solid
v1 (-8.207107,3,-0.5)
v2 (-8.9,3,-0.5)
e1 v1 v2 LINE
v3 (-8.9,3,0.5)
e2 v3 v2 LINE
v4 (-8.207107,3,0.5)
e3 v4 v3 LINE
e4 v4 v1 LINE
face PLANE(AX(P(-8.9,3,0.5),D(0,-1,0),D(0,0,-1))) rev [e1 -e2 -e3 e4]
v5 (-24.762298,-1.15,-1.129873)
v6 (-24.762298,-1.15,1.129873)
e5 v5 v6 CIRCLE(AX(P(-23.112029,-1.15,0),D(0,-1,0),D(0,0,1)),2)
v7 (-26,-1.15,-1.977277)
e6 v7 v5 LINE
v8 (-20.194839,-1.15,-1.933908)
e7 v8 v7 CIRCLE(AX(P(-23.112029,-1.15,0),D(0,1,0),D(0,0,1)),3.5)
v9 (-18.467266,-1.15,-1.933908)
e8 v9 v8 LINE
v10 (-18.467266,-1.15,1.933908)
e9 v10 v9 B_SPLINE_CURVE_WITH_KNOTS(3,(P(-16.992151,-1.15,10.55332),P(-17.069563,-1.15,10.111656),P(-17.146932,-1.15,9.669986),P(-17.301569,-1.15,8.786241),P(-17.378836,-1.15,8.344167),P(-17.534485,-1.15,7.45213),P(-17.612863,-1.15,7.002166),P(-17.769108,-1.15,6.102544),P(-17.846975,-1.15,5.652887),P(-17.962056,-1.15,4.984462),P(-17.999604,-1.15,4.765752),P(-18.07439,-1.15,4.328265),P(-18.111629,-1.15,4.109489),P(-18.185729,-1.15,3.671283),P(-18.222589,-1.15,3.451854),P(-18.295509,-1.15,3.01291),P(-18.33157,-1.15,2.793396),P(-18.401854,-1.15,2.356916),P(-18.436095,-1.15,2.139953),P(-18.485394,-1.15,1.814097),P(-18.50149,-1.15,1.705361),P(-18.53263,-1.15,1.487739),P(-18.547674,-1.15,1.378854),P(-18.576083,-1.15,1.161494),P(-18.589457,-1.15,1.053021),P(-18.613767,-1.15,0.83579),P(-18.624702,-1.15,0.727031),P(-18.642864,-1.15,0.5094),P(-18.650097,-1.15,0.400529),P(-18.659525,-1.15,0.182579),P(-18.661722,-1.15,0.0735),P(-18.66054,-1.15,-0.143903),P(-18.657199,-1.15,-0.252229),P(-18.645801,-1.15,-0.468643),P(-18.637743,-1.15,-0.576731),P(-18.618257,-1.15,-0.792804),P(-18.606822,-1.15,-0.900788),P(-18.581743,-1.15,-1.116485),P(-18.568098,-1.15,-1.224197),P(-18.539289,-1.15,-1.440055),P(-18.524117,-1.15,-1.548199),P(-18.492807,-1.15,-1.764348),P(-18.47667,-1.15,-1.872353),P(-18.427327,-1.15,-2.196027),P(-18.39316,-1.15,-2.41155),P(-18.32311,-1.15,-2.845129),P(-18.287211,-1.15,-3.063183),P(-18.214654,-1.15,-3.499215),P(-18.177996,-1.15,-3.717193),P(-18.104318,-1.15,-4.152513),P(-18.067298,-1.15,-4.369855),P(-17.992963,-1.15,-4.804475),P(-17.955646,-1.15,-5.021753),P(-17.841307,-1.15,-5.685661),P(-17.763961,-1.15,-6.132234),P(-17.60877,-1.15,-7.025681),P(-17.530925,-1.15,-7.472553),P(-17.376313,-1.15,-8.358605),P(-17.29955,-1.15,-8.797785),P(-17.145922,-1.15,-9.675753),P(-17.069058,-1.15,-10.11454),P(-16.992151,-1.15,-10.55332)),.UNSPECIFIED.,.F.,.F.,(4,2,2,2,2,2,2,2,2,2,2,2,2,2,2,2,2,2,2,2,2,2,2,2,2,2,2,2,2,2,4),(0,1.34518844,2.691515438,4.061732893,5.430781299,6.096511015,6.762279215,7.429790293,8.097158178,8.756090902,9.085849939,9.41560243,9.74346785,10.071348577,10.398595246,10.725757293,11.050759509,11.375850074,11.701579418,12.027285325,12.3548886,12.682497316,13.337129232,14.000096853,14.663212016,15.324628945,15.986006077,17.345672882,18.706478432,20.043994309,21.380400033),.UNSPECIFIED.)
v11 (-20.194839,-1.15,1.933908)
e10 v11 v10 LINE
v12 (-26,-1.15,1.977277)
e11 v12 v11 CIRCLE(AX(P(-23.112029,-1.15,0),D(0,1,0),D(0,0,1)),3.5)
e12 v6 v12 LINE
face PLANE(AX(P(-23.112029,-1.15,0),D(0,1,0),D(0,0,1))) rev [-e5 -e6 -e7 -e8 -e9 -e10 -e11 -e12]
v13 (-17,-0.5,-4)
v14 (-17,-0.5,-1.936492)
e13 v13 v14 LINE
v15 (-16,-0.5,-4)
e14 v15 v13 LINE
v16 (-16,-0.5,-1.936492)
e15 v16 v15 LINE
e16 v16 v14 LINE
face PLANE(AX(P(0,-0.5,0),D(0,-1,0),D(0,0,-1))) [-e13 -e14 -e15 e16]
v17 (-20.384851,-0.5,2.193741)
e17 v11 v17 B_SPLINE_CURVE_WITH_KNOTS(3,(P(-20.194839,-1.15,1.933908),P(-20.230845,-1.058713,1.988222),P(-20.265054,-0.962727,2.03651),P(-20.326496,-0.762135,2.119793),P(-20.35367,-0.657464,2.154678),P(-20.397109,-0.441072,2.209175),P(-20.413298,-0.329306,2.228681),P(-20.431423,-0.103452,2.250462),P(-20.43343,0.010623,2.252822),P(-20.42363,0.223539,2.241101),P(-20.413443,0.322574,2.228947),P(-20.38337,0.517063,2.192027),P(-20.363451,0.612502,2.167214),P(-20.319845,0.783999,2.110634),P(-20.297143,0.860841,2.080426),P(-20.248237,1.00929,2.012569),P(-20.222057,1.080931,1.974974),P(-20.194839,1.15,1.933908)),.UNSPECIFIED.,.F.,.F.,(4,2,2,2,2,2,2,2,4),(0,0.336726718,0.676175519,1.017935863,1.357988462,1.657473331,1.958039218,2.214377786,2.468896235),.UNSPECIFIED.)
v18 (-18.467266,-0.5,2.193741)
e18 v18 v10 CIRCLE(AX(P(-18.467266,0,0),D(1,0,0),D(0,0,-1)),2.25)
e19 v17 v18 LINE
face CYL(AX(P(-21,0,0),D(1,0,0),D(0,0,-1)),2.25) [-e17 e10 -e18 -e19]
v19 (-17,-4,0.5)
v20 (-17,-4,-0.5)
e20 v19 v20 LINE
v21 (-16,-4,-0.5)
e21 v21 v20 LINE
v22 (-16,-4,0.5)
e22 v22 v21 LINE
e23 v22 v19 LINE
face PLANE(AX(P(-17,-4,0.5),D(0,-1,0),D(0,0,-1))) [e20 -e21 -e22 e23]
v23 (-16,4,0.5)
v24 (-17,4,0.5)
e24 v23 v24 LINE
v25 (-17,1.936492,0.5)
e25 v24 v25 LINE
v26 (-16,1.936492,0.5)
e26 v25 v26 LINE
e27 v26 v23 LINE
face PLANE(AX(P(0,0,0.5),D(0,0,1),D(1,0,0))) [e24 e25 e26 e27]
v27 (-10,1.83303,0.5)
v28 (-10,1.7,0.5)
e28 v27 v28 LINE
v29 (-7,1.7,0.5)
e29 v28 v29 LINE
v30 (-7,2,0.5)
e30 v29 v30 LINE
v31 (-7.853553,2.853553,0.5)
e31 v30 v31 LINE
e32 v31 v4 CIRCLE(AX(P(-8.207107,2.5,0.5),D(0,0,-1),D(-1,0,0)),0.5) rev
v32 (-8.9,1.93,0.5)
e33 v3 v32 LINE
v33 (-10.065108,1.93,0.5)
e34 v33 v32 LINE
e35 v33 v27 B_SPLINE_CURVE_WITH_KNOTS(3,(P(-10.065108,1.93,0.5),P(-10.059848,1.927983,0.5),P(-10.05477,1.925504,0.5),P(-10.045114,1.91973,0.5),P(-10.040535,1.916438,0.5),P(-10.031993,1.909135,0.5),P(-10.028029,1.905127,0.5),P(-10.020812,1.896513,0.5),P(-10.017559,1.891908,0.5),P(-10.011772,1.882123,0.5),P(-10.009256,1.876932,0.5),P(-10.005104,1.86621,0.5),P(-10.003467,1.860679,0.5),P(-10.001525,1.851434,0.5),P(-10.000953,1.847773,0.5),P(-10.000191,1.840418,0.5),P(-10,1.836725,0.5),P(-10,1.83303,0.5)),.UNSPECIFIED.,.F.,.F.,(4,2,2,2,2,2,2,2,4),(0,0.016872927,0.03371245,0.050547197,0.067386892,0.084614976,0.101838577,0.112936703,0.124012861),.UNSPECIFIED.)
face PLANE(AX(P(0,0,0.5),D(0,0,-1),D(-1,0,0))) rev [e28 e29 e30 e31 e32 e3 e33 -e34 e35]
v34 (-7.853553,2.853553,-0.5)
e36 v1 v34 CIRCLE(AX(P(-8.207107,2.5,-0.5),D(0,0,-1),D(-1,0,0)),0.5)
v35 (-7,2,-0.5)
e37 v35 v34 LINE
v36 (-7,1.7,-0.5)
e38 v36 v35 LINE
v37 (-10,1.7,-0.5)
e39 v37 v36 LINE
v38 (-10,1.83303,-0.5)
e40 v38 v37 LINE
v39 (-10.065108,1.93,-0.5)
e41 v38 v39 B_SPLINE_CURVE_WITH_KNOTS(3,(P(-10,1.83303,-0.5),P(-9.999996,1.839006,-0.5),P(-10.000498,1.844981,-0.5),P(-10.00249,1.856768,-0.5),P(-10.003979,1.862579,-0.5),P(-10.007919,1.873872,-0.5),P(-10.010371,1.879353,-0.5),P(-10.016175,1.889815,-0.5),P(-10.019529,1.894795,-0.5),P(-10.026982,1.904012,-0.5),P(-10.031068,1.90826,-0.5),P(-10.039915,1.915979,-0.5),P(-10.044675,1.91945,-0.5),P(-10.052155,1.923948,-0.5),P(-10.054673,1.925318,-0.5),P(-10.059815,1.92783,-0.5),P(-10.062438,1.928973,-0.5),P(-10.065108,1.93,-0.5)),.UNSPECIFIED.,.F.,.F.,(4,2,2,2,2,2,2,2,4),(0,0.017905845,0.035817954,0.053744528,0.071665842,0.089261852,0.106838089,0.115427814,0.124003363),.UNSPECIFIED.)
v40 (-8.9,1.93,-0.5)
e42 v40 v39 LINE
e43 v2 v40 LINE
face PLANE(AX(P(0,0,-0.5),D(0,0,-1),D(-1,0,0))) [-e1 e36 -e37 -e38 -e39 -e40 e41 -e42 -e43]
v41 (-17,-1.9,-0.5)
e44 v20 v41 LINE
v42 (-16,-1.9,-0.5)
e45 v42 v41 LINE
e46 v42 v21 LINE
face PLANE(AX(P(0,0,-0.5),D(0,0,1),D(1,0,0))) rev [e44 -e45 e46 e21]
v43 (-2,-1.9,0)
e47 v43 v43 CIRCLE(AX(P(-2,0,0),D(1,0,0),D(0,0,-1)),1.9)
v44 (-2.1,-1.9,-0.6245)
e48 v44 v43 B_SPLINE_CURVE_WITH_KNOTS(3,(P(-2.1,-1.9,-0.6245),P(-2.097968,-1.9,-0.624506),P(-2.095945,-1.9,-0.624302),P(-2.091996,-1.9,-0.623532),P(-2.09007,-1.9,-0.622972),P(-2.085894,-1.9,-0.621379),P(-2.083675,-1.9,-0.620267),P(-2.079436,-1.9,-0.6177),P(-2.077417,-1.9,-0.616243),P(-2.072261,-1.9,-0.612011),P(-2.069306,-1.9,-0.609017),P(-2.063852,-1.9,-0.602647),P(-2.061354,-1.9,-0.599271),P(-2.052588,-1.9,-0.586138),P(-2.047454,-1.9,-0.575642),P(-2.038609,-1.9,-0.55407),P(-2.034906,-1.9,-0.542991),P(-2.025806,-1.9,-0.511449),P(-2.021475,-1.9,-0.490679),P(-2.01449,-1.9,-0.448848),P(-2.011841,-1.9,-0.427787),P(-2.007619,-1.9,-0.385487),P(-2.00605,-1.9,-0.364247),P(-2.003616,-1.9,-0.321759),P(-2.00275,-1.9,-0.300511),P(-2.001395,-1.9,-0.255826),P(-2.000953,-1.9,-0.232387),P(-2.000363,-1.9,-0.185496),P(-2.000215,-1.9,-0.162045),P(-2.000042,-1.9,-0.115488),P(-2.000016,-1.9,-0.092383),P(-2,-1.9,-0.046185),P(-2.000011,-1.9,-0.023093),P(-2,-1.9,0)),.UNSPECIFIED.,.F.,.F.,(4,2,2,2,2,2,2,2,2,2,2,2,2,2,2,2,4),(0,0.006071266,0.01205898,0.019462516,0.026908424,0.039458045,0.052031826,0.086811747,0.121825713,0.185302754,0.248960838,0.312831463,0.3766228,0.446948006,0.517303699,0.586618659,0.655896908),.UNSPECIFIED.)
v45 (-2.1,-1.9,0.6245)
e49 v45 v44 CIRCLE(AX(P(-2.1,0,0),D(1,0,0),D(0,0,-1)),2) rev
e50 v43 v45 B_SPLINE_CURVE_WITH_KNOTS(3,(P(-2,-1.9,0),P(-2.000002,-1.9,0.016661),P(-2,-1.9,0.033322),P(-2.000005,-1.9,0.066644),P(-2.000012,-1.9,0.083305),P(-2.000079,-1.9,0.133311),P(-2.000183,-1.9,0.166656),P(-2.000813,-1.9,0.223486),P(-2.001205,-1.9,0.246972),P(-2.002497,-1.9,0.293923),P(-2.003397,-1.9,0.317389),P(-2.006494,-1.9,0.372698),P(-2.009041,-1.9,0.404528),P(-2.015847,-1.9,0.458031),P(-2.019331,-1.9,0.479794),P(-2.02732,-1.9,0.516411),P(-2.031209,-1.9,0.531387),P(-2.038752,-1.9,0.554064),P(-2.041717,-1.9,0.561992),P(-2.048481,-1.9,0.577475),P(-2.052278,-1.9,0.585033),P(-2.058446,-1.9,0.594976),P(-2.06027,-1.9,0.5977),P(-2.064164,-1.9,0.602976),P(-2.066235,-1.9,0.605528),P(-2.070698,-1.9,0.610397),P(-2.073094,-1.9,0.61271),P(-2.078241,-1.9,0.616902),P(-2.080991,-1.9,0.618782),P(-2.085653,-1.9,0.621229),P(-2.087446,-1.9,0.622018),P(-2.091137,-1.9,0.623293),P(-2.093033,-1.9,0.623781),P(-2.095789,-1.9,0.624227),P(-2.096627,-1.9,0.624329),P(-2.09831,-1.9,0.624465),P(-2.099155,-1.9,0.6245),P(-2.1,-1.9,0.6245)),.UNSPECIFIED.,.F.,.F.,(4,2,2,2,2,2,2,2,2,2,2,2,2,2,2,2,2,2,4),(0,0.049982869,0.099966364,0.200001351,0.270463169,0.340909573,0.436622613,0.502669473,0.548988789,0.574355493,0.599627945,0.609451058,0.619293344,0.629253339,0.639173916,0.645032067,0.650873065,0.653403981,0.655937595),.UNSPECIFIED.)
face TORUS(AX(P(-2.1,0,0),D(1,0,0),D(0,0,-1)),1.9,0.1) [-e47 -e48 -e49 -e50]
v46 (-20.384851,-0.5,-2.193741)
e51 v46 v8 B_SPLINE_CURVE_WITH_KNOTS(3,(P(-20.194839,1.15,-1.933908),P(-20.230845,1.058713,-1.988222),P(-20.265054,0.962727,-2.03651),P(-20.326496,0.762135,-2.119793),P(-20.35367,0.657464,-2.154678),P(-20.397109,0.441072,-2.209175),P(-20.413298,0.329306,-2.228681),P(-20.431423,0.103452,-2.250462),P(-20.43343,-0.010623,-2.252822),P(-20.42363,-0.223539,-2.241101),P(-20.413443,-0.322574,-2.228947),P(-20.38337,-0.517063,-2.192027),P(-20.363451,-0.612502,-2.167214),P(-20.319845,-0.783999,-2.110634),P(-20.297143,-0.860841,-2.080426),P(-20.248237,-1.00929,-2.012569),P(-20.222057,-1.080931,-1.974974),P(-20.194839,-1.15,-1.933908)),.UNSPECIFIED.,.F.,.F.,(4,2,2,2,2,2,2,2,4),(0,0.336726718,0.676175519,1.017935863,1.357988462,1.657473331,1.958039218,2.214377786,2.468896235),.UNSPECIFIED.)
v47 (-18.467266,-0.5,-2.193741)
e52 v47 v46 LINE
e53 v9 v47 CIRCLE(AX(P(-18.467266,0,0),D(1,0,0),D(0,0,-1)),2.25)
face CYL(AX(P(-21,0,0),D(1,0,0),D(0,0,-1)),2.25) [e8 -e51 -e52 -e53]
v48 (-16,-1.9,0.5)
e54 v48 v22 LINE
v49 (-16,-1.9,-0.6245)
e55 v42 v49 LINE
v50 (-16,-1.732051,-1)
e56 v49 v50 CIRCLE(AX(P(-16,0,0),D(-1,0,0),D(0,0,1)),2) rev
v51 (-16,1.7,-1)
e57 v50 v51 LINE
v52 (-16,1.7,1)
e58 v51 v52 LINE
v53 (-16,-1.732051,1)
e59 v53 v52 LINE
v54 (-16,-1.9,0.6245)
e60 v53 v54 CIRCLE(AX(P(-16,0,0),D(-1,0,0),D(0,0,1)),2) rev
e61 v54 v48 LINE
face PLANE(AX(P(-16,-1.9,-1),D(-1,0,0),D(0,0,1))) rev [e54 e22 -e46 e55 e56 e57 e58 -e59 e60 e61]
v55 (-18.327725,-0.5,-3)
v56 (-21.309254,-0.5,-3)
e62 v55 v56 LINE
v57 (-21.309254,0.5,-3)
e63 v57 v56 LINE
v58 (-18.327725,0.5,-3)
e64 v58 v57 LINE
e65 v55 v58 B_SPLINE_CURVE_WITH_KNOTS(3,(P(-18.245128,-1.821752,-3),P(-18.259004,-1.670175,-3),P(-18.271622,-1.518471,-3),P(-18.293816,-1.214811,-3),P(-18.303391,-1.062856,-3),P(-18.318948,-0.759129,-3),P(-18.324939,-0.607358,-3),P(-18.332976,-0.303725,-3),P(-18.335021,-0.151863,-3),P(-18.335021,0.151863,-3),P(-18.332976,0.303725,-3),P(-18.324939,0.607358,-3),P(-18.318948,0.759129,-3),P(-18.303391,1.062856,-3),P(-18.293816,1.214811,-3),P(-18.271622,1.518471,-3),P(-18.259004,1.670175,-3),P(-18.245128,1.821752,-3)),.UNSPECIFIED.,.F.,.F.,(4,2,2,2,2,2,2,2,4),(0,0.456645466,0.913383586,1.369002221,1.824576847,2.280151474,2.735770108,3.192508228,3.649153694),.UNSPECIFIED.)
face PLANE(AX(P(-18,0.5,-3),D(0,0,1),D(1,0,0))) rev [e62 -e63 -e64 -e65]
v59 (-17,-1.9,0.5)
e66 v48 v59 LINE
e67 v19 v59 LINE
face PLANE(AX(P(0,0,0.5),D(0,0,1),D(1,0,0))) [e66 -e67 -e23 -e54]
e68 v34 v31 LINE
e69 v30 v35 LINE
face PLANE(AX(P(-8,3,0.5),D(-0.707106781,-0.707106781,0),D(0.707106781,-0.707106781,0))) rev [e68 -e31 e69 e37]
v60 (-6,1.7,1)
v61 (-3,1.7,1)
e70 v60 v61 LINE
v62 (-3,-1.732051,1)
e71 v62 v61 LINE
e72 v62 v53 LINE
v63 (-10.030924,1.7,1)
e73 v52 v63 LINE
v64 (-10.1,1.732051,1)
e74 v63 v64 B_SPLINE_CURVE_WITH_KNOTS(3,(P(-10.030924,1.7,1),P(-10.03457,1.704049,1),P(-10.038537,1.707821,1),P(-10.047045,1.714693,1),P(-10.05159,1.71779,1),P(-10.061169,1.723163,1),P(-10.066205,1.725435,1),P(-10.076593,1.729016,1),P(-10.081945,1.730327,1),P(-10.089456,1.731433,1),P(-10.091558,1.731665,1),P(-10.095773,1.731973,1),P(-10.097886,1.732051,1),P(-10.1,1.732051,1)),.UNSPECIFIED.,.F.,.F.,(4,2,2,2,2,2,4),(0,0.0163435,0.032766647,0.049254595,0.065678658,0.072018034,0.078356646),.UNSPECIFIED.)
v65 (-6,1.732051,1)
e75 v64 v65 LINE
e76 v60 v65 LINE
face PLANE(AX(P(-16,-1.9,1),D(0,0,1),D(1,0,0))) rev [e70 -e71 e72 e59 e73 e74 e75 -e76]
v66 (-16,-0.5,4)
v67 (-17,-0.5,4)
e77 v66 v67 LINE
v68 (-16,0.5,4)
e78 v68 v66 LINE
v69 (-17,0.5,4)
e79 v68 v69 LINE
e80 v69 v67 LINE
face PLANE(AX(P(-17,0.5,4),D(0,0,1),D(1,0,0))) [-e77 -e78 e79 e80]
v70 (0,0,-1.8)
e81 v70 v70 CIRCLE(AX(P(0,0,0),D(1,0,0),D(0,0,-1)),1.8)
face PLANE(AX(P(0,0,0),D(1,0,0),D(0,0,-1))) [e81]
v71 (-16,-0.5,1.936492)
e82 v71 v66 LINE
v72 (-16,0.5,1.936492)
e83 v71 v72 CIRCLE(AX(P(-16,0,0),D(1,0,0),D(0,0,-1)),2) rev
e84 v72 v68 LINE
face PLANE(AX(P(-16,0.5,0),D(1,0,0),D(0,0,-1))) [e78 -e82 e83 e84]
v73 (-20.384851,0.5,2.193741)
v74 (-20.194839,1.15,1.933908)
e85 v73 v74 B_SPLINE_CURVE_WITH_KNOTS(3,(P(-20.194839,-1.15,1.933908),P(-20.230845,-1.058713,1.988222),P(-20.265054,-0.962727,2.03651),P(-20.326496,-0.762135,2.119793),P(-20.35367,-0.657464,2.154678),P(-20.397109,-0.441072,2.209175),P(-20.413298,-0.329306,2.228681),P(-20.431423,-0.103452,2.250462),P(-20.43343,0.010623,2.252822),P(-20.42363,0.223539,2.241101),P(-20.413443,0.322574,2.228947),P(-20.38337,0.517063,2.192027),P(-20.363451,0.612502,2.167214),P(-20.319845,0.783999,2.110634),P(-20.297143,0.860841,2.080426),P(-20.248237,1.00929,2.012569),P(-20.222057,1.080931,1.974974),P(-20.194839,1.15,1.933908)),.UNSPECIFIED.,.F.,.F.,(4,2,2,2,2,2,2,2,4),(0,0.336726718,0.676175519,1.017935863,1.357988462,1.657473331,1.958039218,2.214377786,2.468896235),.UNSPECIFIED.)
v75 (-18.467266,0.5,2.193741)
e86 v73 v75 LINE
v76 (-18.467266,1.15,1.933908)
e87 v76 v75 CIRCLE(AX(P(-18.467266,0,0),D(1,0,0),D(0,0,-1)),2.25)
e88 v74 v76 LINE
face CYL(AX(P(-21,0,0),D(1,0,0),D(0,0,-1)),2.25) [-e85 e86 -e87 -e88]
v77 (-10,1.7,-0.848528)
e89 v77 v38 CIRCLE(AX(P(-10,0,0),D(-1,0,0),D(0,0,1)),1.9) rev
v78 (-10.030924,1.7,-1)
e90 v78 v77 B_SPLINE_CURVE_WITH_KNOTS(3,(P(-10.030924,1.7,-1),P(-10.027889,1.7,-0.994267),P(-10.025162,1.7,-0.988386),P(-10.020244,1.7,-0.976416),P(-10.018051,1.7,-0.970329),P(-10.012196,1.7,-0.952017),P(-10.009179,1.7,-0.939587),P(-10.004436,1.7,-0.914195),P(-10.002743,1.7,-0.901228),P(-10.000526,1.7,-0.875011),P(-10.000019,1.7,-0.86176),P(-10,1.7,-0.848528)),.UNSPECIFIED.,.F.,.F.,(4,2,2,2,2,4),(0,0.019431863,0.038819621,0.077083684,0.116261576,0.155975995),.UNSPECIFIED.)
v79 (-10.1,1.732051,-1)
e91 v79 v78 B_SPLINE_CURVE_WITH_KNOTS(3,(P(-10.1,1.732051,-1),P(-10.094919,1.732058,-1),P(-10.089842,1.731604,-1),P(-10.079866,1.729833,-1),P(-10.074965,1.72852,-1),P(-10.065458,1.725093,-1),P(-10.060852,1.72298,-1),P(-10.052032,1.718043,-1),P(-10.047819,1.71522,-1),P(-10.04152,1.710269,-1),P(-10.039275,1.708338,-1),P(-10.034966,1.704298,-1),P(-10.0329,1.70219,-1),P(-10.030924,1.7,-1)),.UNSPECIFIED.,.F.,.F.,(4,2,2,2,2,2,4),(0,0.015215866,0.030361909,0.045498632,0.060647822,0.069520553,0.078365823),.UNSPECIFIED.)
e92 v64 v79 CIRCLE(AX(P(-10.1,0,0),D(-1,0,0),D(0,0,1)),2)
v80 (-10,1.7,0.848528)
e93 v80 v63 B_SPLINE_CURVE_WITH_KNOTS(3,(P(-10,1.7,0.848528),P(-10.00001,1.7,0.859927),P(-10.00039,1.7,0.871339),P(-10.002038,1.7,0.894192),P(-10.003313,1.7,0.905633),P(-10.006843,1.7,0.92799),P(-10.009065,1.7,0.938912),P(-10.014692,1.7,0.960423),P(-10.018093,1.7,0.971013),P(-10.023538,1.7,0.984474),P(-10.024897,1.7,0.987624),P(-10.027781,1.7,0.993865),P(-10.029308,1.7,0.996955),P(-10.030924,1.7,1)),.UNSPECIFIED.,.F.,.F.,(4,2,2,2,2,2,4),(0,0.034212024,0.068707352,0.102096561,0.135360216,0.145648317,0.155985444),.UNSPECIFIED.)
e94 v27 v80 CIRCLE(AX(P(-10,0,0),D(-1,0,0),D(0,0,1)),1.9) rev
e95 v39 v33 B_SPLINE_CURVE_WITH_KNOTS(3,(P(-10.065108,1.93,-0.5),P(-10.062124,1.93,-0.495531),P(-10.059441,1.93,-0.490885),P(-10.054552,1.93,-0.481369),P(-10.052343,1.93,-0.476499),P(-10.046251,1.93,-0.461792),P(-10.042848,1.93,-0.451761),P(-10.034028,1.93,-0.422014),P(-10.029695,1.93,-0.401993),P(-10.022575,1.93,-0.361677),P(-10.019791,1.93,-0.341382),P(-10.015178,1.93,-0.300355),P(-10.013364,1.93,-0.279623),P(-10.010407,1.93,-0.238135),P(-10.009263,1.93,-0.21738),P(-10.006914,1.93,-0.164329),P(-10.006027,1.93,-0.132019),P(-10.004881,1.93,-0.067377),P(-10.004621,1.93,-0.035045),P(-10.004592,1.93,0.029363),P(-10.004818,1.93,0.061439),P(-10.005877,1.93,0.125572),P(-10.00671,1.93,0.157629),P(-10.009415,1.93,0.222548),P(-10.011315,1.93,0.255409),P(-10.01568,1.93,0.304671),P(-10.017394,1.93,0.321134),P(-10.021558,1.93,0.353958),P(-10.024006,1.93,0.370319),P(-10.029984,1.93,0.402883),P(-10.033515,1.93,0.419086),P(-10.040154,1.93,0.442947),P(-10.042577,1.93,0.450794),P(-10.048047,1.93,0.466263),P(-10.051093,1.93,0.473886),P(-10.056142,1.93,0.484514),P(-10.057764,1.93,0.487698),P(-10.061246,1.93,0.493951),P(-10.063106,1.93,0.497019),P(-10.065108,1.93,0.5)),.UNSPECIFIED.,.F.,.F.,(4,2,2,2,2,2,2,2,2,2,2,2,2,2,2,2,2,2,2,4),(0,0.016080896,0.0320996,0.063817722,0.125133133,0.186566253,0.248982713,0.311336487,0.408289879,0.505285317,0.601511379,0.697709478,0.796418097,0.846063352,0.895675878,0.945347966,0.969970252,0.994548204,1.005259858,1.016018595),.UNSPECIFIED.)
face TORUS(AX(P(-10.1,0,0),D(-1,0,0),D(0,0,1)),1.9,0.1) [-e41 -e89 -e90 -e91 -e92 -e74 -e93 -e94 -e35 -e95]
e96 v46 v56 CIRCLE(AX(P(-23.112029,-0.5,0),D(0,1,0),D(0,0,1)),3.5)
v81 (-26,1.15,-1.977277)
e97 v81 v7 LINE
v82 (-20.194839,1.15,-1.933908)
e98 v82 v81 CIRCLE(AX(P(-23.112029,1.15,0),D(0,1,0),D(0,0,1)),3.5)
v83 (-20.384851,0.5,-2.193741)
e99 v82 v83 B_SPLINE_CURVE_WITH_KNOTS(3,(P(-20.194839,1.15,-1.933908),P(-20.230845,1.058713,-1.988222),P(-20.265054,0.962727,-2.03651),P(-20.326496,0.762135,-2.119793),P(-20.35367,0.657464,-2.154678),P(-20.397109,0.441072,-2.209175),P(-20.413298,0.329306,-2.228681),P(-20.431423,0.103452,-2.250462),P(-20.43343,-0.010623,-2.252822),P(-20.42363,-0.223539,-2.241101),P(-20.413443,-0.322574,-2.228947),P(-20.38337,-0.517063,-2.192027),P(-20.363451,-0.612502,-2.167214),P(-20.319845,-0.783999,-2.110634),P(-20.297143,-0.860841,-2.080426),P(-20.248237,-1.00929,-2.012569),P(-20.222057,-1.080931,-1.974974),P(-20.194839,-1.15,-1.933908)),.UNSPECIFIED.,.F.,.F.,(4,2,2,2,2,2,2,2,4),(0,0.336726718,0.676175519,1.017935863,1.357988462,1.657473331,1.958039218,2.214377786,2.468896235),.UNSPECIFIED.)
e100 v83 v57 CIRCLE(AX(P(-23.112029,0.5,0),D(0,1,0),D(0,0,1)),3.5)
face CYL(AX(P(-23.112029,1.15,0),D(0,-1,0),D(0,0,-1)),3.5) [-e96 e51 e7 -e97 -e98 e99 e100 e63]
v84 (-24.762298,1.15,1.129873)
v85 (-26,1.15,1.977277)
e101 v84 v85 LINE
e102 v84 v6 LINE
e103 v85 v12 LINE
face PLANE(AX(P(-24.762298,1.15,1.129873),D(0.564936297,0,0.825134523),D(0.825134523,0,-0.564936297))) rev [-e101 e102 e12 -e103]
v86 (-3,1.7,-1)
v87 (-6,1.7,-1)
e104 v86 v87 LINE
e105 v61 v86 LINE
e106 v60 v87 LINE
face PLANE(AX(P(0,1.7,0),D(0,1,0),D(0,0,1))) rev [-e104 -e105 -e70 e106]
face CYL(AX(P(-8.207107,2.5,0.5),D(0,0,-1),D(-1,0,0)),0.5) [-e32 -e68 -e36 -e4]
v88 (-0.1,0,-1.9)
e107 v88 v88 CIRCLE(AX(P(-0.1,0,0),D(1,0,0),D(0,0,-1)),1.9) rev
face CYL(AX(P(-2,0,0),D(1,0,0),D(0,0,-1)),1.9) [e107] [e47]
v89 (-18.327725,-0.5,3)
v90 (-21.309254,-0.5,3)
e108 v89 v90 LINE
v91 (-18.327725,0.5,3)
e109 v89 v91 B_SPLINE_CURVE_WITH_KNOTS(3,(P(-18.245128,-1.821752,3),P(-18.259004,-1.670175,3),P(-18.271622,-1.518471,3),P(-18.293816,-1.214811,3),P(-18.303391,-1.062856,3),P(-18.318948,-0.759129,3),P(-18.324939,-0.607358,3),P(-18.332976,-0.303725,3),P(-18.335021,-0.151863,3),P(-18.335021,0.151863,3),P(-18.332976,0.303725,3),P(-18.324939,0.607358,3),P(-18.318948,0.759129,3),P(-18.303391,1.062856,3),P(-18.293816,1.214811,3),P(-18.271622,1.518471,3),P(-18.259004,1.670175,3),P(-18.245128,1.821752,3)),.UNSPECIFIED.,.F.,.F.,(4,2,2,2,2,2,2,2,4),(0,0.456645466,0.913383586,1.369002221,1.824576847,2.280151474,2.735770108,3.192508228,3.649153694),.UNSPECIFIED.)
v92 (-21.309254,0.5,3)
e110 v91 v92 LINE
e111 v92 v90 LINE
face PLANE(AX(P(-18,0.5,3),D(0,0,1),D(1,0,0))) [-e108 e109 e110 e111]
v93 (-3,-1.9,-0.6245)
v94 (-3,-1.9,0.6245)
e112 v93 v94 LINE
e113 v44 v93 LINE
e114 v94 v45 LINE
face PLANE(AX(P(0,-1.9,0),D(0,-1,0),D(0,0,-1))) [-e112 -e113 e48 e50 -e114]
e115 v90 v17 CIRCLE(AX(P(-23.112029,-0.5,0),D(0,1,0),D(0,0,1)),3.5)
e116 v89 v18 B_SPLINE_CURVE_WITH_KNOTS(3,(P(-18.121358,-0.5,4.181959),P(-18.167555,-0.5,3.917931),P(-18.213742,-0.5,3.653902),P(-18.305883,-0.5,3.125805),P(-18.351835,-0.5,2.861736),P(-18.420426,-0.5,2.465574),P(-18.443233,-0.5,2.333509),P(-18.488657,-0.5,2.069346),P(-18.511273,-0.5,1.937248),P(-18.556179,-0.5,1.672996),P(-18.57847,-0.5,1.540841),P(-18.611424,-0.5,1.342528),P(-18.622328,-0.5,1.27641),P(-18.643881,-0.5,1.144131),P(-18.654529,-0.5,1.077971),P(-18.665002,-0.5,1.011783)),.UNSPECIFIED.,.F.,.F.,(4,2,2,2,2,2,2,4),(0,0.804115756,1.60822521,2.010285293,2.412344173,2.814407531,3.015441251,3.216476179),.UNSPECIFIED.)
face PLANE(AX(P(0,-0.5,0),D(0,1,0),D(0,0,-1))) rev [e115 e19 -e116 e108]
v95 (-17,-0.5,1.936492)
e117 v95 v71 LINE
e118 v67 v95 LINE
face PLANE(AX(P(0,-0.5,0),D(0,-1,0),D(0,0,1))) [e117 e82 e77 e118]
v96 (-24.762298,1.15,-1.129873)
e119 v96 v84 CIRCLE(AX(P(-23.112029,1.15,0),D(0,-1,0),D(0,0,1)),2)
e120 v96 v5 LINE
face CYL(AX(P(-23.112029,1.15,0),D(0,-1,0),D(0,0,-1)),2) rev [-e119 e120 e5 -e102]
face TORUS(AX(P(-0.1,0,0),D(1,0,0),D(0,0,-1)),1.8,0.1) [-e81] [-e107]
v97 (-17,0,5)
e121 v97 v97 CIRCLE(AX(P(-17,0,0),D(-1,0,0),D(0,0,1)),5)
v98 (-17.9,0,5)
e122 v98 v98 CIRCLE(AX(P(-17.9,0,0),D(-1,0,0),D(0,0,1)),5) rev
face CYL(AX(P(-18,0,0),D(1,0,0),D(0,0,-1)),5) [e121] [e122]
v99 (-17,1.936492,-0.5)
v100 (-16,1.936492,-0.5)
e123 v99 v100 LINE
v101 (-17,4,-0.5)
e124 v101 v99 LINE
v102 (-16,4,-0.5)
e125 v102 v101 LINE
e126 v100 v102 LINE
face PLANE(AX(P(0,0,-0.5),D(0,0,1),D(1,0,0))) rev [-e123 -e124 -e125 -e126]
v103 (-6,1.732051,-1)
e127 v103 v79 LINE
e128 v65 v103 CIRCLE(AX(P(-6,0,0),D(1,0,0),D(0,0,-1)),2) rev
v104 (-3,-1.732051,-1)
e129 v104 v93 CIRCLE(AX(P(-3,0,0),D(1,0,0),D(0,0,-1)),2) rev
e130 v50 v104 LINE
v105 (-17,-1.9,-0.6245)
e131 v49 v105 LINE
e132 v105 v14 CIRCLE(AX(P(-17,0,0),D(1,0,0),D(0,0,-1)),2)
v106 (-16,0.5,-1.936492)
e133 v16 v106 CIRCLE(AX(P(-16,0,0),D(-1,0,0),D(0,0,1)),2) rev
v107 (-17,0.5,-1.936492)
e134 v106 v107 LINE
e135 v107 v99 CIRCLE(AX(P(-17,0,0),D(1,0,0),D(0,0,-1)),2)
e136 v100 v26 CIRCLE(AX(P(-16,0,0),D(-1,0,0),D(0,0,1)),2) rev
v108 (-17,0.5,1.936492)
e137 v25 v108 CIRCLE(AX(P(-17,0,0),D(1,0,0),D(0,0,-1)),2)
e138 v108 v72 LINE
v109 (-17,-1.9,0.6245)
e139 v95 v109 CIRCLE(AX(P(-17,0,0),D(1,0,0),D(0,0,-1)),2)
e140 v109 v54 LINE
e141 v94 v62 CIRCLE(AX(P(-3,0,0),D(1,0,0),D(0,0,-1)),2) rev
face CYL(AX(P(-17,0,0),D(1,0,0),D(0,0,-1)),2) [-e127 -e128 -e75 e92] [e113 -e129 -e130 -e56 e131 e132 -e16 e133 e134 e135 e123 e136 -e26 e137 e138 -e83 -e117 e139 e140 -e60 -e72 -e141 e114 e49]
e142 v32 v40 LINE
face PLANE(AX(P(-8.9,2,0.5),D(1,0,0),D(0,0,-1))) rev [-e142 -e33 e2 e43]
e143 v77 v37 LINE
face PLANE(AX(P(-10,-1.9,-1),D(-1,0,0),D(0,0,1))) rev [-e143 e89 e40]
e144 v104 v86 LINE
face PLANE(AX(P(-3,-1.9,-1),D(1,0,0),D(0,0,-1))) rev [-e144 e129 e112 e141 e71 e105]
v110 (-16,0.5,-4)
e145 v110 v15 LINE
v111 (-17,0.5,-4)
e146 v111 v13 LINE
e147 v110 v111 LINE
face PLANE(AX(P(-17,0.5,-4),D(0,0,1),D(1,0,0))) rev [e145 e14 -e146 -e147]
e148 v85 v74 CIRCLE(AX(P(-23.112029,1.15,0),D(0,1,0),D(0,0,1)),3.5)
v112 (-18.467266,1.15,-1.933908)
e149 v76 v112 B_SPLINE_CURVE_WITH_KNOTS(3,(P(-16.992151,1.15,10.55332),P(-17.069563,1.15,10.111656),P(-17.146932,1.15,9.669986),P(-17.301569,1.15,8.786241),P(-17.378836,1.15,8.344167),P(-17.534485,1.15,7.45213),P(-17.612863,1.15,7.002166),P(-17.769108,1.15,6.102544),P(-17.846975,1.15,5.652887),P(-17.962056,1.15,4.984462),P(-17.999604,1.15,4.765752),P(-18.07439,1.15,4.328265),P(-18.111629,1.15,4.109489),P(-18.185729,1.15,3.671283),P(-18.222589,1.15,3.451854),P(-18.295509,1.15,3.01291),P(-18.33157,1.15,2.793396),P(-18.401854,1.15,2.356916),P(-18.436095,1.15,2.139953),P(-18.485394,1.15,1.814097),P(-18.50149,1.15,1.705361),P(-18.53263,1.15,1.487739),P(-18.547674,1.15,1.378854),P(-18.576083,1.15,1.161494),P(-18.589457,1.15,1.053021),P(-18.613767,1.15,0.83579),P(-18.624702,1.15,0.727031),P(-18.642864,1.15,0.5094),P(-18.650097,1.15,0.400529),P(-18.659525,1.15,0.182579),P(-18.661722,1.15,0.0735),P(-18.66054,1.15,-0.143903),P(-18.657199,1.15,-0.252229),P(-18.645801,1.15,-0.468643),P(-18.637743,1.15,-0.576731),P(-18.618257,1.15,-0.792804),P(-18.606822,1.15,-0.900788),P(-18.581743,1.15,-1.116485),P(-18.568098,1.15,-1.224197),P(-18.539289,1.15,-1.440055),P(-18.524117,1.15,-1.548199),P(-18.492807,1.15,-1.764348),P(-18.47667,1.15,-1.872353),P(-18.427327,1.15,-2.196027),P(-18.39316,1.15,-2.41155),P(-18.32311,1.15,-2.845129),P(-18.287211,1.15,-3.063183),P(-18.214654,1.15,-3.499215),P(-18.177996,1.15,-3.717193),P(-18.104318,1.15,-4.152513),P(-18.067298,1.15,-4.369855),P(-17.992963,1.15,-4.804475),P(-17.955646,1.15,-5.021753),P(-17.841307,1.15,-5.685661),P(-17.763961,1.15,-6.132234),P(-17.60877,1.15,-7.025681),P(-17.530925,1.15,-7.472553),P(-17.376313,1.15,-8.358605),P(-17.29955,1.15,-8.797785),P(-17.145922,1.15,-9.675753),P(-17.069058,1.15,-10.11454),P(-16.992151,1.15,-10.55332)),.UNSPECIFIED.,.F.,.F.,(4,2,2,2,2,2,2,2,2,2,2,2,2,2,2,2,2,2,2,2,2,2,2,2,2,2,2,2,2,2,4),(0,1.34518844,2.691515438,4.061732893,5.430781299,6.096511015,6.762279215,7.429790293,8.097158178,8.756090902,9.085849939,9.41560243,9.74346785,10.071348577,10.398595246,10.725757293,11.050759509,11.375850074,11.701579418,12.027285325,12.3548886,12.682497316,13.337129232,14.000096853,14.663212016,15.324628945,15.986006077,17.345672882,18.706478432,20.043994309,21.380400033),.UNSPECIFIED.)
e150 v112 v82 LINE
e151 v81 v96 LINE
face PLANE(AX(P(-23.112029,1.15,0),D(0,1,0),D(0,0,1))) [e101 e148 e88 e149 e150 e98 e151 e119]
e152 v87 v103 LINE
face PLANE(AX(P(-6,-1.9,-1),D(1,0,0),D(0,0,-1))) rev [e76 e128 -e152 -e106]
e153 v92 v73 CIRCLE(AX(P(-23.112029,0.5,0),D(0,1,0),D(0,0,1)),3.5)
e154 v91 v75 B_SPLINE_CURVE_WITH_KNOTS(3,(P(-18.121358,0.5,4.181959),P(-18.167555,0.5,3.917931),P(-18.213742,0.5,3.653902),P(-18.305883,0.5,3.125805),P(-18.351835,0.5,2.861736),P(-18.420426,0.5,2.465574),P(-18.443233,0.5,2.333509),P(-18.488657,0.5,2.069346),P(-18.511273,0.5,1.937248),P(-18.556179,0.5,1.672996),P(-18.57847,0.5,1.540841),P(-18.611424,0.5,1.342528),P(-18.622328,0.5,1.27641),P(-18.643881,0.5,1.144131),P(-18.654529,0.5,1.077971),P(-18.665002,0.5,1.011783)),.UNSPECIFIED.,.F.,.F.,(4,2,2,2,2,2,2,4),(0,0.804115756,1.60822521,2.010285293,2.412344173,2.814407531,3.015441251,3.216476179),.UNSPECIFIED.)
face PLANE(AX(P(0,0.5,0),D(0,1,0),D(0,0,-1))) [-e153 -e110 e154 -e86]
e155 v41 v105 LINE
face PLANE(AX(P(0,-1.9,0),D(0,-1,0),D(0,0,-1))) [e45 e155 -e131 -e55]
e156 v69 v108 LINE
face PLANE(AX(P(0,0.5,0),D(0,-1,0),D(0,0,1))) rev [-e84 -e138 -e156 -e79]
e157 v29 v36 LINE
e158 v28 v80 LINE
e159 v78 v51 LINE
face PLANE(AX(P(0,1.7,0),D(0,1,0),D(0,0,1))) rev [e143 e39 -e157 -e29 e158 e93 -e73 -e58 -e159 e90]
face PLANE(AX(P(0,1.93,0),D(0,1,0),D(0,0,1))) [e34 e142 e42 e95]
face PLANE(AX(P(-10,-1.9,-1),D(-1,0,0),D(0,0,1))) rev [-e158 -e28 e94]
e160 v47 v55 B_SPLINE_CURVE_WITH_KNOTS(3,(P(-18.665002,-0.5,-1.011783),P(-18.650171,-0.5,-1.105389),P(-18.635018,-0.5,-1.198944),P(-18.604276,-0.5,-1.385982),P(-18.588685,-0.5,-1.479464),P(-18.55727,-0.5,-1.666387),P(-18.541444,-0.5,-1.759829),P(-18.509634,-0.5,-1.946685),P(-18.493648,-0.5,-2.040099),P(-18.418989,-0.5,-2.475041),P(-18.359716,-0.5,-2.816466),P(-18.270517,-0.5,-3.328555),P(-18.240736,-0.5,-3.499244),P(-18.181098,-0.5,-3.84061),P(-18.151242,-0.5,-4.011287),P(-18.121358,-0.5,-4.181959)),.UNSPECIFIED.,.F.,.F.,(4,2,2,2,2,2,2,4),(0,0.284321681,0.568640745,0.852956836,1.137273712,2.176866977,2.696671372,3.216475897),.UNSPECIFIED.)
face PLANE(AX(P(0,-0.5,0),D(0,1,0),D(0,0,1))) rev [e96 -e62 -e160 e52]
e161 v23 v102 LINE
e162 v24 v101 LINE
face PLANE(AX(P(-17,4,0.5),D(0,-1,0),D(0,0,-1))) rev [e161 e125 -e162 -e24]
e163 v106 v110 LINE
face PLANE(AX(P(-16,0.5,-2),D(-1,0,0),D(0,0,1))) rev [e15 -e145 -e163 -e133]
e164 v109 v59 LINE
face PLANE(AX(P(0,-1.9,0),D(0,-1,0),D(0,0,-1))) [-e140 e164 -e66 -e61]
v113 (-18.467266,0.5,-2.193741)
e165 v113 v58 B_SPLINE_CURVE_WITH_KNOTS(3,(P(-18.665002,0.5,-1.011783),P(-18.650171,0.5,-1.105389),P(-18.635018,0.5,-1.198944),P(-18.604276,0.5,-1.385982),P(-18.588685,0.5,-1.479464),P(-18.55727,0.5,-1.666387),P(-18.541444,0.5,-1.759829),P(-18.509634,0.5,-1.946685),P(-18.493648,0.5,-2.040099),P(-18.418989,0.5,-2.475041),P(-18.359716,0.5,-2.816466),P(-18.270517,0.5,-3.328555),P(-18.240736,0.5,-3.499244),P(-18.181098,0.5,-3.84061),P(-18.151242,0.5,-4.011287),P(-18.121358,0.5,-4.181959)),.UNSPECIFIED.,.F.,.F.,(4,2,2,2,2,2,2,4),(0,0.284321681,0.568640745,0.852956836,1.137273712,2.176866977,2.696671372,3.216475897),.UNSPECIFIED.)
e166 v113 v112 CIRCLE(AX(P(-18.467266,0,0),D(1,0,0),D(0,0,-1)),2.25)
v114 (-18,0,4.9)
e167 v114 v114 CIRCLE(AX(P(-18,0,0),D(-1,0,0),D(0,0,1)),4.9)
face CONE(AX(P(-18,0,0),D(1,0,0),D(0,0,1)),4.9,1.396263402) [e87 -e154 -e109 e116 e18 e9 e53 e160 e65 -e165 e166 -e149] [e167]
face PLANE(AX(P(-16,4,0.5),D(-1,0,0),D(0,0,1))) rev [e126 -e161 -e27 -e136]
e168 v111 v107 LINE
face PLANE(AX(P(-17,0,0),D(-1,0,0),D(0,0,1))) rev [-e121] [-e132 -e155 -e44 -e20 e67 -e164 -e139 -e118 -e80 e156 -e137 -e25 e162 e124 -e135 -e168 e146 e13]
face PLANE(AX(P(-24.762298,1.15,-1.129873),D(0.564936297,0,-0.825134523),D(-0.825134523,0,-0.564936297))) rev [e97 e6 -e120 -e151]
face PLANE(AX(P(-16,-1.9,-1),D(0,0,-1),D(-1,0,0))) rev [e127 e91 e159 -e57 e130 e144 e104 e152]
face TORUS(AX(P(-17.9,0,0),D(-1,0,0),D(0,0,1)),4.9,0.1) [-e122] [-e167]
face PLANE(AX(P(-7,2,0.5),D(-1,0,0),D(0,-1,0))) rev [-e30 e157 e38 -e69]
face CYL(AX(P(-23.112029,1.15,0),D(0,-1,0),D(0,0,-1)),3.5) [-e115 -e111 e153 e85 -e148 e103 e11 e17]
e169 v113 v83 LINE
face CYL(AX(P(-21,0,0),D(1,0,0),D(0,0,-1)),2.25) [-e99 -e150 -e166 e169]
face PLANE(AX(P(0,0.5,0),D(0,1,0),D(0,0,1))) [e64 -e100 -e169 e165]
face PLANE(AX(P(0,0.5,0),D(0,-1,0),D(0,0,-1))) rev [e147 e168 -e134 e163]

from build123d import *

# Parameters (mm, degrees)
SCHIZZO1_R                    = 2
ESTRUSIONE_ESTRUSIONE1_DEPTH  = 17
SCHIZZO2_OUTSIDE_W            = 9.584
SCHIZZO2_OUTSIDE_H            = 9.584
SCHIZZO2_OUTSIDE_R            = 1.9
TAGLIO_ESTRUSIONE1_DEPTH      = 2
SCHIZZO6_W                    = 15
SCHIZZO6_H                    = 4
TAGLIO_ESTRUSIONE3_DEPTH      = 0.1
TAGLIO_ESTRUSIONE4_DEPTH      = 1.7
TAGLIO_ESTRUSIONE4_DEPTH_BACK = 18.23368794
SCHIZZO5_W                    = 13
SCHIZZO5_H                    = 2
SCHIZZO7_W                    = 4
SCHIZZO7_H                    = 2
TAGLIO_ESTRUSIONE5_DEPTH      = 18.555910686
ESTRUSIONE_ESTRUSIONE2_DEPTH  = 0.5
TAGLIO_ESTRUSIONE6_DEPTH      = 0.07
ESTRUSIONE_ESTRUSIONE4_DEPTH  = 0.5
ESTRUSIONE_ESTRUSIONE5_DEPTH  = 0.5
SCHIZZO20_R                   = 5
ESTRUSIONE_ESTRUSIONE6_DEPTH  = 1
SCHIZZO23_R                   = 2.25
ESTRUSIONE_ESTRUSIONE7_DEPTH  = 3
ESTRUSIONE_ESTRUSIONE10_DEPTH = 1.15
ESTRUSIONE_ESTRUSIONE8_DEPTH  = 0.5
SCHIZZO35_W                   = 3
SCHIZZO35_H                   = 3.867815922
TAGLIO_ESTRUSIONE7_DEPTH      = 1.3
RACCORDO22_R                  = 0.5
RACCORDO23_R                  = 0.1
RACCORDO24_R                  = 0.1
RACCORDO25_R                  = 0.1
RACCORDO28_R                  = 0.1


# Some blends are built 0.0001 mm under size
with BuildPart() as part:
    # Schizzo1 → Estrusione-Estrusione1 (new body)
    with BuildSketch(Plane(origin=(0, 0, 0), x_dir=(0, 0, -1), z_dir=(1, 0, 0))):
        Circle(SCHIZZO1_R)
    extrude(amount=-ESTRUSIONE_ESTRUSIONE1_DEPTH)

    # Schizzo2 outside → Taglio-Estrusione1 (cut)
    with BuildSketch(Plane(origin=(0, 0, 0), x_dir=(0, 0, -1), z_dir=(1, 0, 0))):
        Rectangle(SCHIZZO2_OUTSIDE_W, SCHIZZO2_OUTSIDE_H)
        Circle(SCHIZZO2_OUTSIDE_R, mode=Mode.SUBTRACT)
    extrude(amount=-TAGLIO_ESTRUSIONE1_DEPTH, mode=Mode.SUBTRACT)

    # Schizzo6 → Taglio-Estrusione3 (cut)
    with BuildSketch(Plane(origin=(0, -2, 0), x_dir=(-1, 0, 0), z_dir=(0, -1, 0))):
        with Locations((9.5, 0)):
            Rectangle(SCHIZZO6_W, SCHIZZO6_H)
    extrude(amount=-TAGLIO_ESTRUSIONE3_DEPTH, mode=Mode.SUBTRACT)

    # Schizzo5 → Taglio-Estrusione4 (cut, two sides: drawn at the far end of the back side and taken through both)
    with BuildSketch(Plane(origin=(0, 0, 0), x_dir=(1, 0, 0), z_dir=(0, 1, 0)).offset(-TAGLIO_ESTRUSIONE4_DEPTH_BACK)):
        with Locations((-9.5, 0)):
            Rectangle(SCHIZZO5_W, SCHIZZO5_H)
    extrude(amount=TAGLIO_ESTRUSIONE4_DEPTH + TAGLIO_ESTRUSIONE4_DEPTH_BACK, mode=Mode.SUBTRACT)

    # Schizzo7 → Taglio-Estrusione5 (cut, through all)
    with BuildSketch(Plane(origin=(0, 2, 0), x_dir=(1, 0, 0), z_dir=(0, 1, 0))):
        with Locations((-8, 0)):
            Rectangle(SCHIZZO7_W, SCHIZZO7_H)
    extrude(amount=-TAGLIO_ESTRUSIONE5_DEPTH, mode=Mode.SUBTRACT)

    # Schizzo12 → Estrusione-Estrusione2 (add, symmetric)
    with BuildSketch(Plane.XY):
        Polygon((-10, 2), (-8.9, 2), (-8.9, 3), (-8, 3), (-7, 2), (-7, 1.7), (-10, 1.7), align=None)
    extrude(amount=ESTRUSIONE_ESTRUSIONE2_DEPTH, both=True)

    # Schizzo16 → Taglio-Estrusione6 (cut)
    with BuildSketch(Plane(origin=(0, 2, 0), x_dir=(1, 0, 0), z_dir=(0, 1, 0))):
        Polygon((-8.9, 0.5), (-10, 0.5), (-10, 0), (-10, -0.5), (-8.9, -0.5), align=None)
    extrude(amount=-TAGLIO_ESTRUSIONE6_DEPTH, mode=Mode.SUBTRACT)

    # Schizzo17 → Estrusione-Estrusione4 (add, symmetric)
    with BuildSketch(Plane.XY):
        Polygon((-17, 4), (-16, 4), (-16, 0.047058824), (-17, 0.05), align=None)
    estrusione_estrusione4 = extrude(amount=ESTRUSIONE_ESTRUSIONE4_DEPTH, both=True)

    # Specchia2: Estrusione-Estrusione4 across plane
    add(estrusione_estrusione4.mirror(Plane.ZX))

    # Schizzo19 → Estrusione-Estrusione5 (add, symmetric)
    with BuildSketch(Plane(origin=(0, 0, 0), x_dir=(1, 0, 0), z_dir=(0, 1, 0))):
        Polygon((-17, 2), (-17, 0), (-16, 0), (-16, 2), (-16, 4), (-17, 4), align=None)
    estrusione_estrusione5 = extrude(amount=ESTRUSIONE_ESTRUSIONE5_DEPTH, both=True)

    # Specchia5: Estrusione-Estrusione5 across plane
    add(estrusione_estrusione5.mirror(Plane.XY))

    # Schizzo20 → Estrusione-Estrusione6 (add)
    with BuildSketch(Plane.ZY.offset(17)):
        Circle(SCHIZZO20_R)
    extrude(amount=ESTRUSIONE_ESTRUSIONE6_DEPTH)

    # Schizzo23 → Estrusione-Estrusione7 (add)
    with BuildSketch(Plane.ZY.offset(18)):
        Circle(SCHIZZO23_R)
    extrude(amount=ESTRUSIONE_ESTRUSIONE7_DEPTH)

    # Schizzo22 → Estrusione-Estrusione10 (add, symmetric)
    with BuildSketch(Plane(origin=(0, 0, 0), x_dir=(1, 0, 0), z_dir=(0, 1, 0))):
        with BuildLine():
            Line((-24.762298216, -1.129872594), (-26, -1.977277039))
            ThreePointArc((-26, -1.977277039), (-19.612029171, 0), (-26, 1.977277039))
            Line((-26, 1.977277039), (-24.762298216, 1.129872594))
            ThreePointArc((-24.762298216, 1.129872594), (-21.112029171, 0), (-24.762298216, -1.129872594))
        make_face()
    extrude(amount=ESTRUSIONE_ESTRUSIONE10_DEPTH, both=True)

    # Schizzo34 → Estrusione-Estrusione8 (add, symmetric)
    with BuildSketch(Plane(origin=(0, 0, 0), x_dir=(1, 0, 0), z_dir=(0, 1, 0))):
        Polygon((-18, 3), (-21.309253533, 3), (-18, 0), align=None)
    estrusione_estrusione8 = extrude(amount=ESTRUSIONE_ESTRUSIONE8_DEPTH, both=True)

    # Specchia6: Estrusione-Estrusione8 across plane
    add(estrusione_estrusione8.mirror(Plane.XY))

    # Schizzo35 → Taglio-Estrusione7 (cut)
    with BuildSketch(Plane(origin=(0, 1.15, 0), x_dir=(1, 0, 0), z_dir=(0, 1, 0))):
        with Locations((-19.5, 0)):
            Rectangle(SCHIZZO35_W, SCHIZZO35_H)
    taglio_estrusione7 = extrude(amount=TAGLIO_ESTRUSIONE7_DEPTH, mode=Mode.SUBTRACT)

    # Specchia7: Taglio-Estrusione7 across plane
    add(taglio_estrusione7.mirror(Plane.ZX), mode=Mode.SUBTRACT)

    # Raccordo22
    raccordo22_edges = [part.edges().sort_by_distance(p)[0] for p in [
        (-8, 3, 0),
    ]]
    fillet(raccordo22_edges, radius=RACCORDO22_R)

    # Raccordo23
    raccordo23_edges = [part.edges().sort_by_distance(p)[0] for p in [
        (-2, 2, 0),
    ]]
    fillet(raccordo23_edges, radius=RACCORDO23_R - 0.0001)  # a hair under: the kernel refuses the full size

    # Raccordo24
    raccordo24_edges = [part.edges().sort_by_distance(p)[0] for p in [
        (0, 0, 1.9),
    ]]
    fillet(raccordo24_edges, radius=RACCORDO24_R)

    # Raccordo25
    raccordo25_edges = [part.edges().sort_by_distance(p)[0] for p in [
        (-18, 0, -5),
    ]]
    fillet(raccordo25_edges, radius=RACCORDO25_R)

    # Raccordo28
    # the kernel refuses this fillet: 0.1 mm, written as the material it takes off along each edge
    with BuildSketch(Plane(origin=(-10, 0, 0), x_dir=(0, 0.7969175395012055, 0.6040881022130338), z_dir=(0, -0.6040881022130338, 0.7969175395012055))) as raccordo28_piece_1_section:
        with BuildLine():
            CenterArc((2 - RACCORDO28_R, RACCORDO28_R), RACCORDO28_R, 270, 90)
            Line((2 - RACCORDO28_R, 0), (2, 0))
            Line((2, 0), (2, RACCORDO28_R))
        make_face()
    raccordo28_piece_1 = revolve(axis=Axis((-10, 0, 0), (-1, 0, 0)), revolution_arc=74.326501832, mode=Mode.PRIVATE)
    raccordo28_piece_1 = split(raccordo28_piece_1, bisect_by=Plane(origin=(-10.022414525, 1.819827674, 1), z_dir=(0, 0, -1)), keep=Keep.TOP, mode=Mode.PRIVATE)
    raccordo28_piece_1 = split(raccordo28_piece_1, bisect_by=Plane(origin=(-10.022414525, 1.819827674, 0.5), z_dir=(0, 0, 1)), keep=Keep.TOP, mode=Mode.PRIVATE)
    raccordo28_piece_1 = split(raccordo28_piece_1, bisect_by=Plane(origin=(-10.022414525, 1.93, 0.756995565), z_dir=(0, -1, 0)), keep=Keep.TOP, mode=Mode.PRIVATE)
    add(raccordo28_piece_1, mode=Mode.SUBTRACT)
    with BuildSketch(Plane(origin=(-10, 0, 0), x_dir=(0, 0.7969175395012055, 0.6040881022130338), z_dir=(0, -0.6040881022130338, 0.7969175395012055))) as raccordo28_piece_2_section:
        with BuildLine():
            CenterArc((2 - RACCORDO28_R, RACCORDO28_R), RACCORDO28_R, 270, 90)
            Line((2 - RACCORDO28_R, 0), (2, 0))
            Line((2, 0), (2, RACCORDO28_R))
        make_face()
    raccordo28_piece_2 = revolve(axis=Axis((-10, 0, 0), (-1, 0, 0)), revolution_arc=74.326501832, mode=Mode.PRIVATE)
    raccordo28_piece_2 = split(raccordo28_piece_2, bisect_by=Plane(origin=(-10.044225117, 1.932988234, 0.5), z_dir=(0, 0, 1)), keep=Keep.TOP, mode=Mode.PRIVATE)
    raccordo28_piece_2 = split(raccordo28_piece_2, bisect_by=Plane(origin=(-10.044225117, 1.93, 0.511192028), z_dir=(0, 1, 0)), keep=Keep.TOP, mode=Mode.PRIVATE)
    add(raccordo28_piece_2, mode=Mode.SUBTRACT)
    with BuildSketch(Plane(origin=(-10, 0, 0), x_dir=(0, 0.7969175395012055, 0.6040881022130338), z_dir=(0, -0.6040881022130338, 0.7969175395012055))) as raccordo28_piece_3_section:
        with BuildLine():
            CenterArc((2 - RACCORDO28_R, RACCORDO28_R), RACCORDO28_R, 270, 90)
            Line((2 - RACCORDO28_R, 0), (2, 0))
            Line((2, 0), (2, RACCORDO28_R))
        make_face()
    raccordo28_piece_3 = revolve(axis=Axis((-10, 0, 0), (-1, 0, 0)), revolution_arc=74.326501832, mode=Mode.PRIVATE)
    raccordo28_piece_3 = split(raccordo28_piece_3, bisect_by=Plane(origin=(-10.022414524, 1.819827674, -1), z_dir=(0, 0, 1)), keep=Keep.TOP, mode=Mode.PRIVATE)
    raccordo28_piece_3 = split(raccordo28_piece_3, bisect_by=Plane(origin=(-10.022414524, 1.93, -0.756995565), z_dir=(0, -1, 0)), keep=Keep.TOP, mode=Mode.PRIVATE)
    raccordo28_piece_3 = split(raccordo28_piece_3, bisect_by=Plane(origin=(-10.022414524, 1.819827674, -0.5), z_dir=(0, 0, -1)), keep=Keep.TOP, mode=Mode.PRIVATE)
    add(raccordo28_piece_3, mode=Mode.SUBTRACT)
    with BuildSketch(Plane(origin=(-10, 0, 0), x_dir=(0, 0.7969175395012055, 0.6040881022130338), z_dir=(0, -0.6040881022130338, 0.7969175395012055))) as raccordo28_piece_4_section:
        with BuildLine():
            CenterArc((2 - RACCORDO28_R, RACCORDO28_R), RACCORDO28_R, 270, 90)
            Line((2 - RACCORDO28_R, 0), (2, 0))
            Line((2, 0), (2, RACCORDO28_R))
        make_face()
    raccordo28_piece_4 = revolve(axis=Axis((-10, 0, 0), (-1, 0, 0)), revolution_arc=74.326501832, mode=Mode.PRIVATE)
    raccordo28_piece_4 = split(raccordo28_piece_4, bisect_by=Plane(origin=(-10.040080162, 1.981654904, 0.5), z_dir=(0, 0, -1)), keep=Keep.TOP, mode=Mode.PRIVATE)
    raccordo28_piece_4 = split(raccordo28_piece_4, bisect_by=Plane(origin=(-10.040080162, 1.93, 0), z_dir=(0, 1, 0)), keep=Keep.TOP, mode=Mode.PRIVATE)
    raccordo28_piece_4 = split(raccordo28_piece_4, bisect_by=Plane(origin=(-10.040080162, 1.981654904, -0.5), z_dir=(0, 0, 1)), keep=Keep.TOP, mode=Mode.PRIVATE)
    add(raccordo28_piece_4, mode=Mode.SUBTRACT)
    with BuildSketch(Plane(origin=(-10, 0, 0), x_dir=(0, 0.7969175395012055, 0.6040881022130338), z_dir=(0, -0.6040881022130338, 0.7969175395012055))) as raccordo28_piece_5_section:
        with BuildLine():
            CenterArc((2 - RACCORDO28_R, RACCORDO28_R), RACCORDO28_R, 270, 90)
            Line((2 - RACCORDO28_R, 0), (2, 0))
            Line((2, 0), (2, RACCORDO28_R))
        make_face()
    raccordo28_piece_5 = revolve(axis=Axis((-10, 0, 0), (-1, 0, 0)), revolution_arc=74.326501832, mode=Mode.PRIVATE)
    raccordo28_piece_5 = split(raccordo28_piece_5, bisect_by=Plane(origin=(-10.044225117, 1.93, -0.511192028), z_dir=(0, 1, 0)), keep=Keep.TOP, mode=Mode.PRIVATE)
    raccordo28_piece_5 = split(raccordo28_piece_5, bisect_by=Plane(origin=(-10.044225117, 1.932988234, -0.5), z_dir=(0, 0, -1)), keep=Keep.TOP, mode=Mode.PRIVATE)
    add(raccordo28_piece_5, mode=Mode.SUBTRACT)

    # Estrusione-Estrusione9 cone 1 section (through the dimple's axis) → Estrusione-Estrusione9 (revolve)
    with BuildSketch(Plane(origin=(-18, 0, 0), x_dir=(0, 0, -1), z_dir=(0, 1, 0))):
        Polygon((0, 0), (4.9, 0), (0, 0.864002205), align=None)
    revolve(axis=Axis((-18, 0, 0), (-1, 0, 0)))


solid = part.part
